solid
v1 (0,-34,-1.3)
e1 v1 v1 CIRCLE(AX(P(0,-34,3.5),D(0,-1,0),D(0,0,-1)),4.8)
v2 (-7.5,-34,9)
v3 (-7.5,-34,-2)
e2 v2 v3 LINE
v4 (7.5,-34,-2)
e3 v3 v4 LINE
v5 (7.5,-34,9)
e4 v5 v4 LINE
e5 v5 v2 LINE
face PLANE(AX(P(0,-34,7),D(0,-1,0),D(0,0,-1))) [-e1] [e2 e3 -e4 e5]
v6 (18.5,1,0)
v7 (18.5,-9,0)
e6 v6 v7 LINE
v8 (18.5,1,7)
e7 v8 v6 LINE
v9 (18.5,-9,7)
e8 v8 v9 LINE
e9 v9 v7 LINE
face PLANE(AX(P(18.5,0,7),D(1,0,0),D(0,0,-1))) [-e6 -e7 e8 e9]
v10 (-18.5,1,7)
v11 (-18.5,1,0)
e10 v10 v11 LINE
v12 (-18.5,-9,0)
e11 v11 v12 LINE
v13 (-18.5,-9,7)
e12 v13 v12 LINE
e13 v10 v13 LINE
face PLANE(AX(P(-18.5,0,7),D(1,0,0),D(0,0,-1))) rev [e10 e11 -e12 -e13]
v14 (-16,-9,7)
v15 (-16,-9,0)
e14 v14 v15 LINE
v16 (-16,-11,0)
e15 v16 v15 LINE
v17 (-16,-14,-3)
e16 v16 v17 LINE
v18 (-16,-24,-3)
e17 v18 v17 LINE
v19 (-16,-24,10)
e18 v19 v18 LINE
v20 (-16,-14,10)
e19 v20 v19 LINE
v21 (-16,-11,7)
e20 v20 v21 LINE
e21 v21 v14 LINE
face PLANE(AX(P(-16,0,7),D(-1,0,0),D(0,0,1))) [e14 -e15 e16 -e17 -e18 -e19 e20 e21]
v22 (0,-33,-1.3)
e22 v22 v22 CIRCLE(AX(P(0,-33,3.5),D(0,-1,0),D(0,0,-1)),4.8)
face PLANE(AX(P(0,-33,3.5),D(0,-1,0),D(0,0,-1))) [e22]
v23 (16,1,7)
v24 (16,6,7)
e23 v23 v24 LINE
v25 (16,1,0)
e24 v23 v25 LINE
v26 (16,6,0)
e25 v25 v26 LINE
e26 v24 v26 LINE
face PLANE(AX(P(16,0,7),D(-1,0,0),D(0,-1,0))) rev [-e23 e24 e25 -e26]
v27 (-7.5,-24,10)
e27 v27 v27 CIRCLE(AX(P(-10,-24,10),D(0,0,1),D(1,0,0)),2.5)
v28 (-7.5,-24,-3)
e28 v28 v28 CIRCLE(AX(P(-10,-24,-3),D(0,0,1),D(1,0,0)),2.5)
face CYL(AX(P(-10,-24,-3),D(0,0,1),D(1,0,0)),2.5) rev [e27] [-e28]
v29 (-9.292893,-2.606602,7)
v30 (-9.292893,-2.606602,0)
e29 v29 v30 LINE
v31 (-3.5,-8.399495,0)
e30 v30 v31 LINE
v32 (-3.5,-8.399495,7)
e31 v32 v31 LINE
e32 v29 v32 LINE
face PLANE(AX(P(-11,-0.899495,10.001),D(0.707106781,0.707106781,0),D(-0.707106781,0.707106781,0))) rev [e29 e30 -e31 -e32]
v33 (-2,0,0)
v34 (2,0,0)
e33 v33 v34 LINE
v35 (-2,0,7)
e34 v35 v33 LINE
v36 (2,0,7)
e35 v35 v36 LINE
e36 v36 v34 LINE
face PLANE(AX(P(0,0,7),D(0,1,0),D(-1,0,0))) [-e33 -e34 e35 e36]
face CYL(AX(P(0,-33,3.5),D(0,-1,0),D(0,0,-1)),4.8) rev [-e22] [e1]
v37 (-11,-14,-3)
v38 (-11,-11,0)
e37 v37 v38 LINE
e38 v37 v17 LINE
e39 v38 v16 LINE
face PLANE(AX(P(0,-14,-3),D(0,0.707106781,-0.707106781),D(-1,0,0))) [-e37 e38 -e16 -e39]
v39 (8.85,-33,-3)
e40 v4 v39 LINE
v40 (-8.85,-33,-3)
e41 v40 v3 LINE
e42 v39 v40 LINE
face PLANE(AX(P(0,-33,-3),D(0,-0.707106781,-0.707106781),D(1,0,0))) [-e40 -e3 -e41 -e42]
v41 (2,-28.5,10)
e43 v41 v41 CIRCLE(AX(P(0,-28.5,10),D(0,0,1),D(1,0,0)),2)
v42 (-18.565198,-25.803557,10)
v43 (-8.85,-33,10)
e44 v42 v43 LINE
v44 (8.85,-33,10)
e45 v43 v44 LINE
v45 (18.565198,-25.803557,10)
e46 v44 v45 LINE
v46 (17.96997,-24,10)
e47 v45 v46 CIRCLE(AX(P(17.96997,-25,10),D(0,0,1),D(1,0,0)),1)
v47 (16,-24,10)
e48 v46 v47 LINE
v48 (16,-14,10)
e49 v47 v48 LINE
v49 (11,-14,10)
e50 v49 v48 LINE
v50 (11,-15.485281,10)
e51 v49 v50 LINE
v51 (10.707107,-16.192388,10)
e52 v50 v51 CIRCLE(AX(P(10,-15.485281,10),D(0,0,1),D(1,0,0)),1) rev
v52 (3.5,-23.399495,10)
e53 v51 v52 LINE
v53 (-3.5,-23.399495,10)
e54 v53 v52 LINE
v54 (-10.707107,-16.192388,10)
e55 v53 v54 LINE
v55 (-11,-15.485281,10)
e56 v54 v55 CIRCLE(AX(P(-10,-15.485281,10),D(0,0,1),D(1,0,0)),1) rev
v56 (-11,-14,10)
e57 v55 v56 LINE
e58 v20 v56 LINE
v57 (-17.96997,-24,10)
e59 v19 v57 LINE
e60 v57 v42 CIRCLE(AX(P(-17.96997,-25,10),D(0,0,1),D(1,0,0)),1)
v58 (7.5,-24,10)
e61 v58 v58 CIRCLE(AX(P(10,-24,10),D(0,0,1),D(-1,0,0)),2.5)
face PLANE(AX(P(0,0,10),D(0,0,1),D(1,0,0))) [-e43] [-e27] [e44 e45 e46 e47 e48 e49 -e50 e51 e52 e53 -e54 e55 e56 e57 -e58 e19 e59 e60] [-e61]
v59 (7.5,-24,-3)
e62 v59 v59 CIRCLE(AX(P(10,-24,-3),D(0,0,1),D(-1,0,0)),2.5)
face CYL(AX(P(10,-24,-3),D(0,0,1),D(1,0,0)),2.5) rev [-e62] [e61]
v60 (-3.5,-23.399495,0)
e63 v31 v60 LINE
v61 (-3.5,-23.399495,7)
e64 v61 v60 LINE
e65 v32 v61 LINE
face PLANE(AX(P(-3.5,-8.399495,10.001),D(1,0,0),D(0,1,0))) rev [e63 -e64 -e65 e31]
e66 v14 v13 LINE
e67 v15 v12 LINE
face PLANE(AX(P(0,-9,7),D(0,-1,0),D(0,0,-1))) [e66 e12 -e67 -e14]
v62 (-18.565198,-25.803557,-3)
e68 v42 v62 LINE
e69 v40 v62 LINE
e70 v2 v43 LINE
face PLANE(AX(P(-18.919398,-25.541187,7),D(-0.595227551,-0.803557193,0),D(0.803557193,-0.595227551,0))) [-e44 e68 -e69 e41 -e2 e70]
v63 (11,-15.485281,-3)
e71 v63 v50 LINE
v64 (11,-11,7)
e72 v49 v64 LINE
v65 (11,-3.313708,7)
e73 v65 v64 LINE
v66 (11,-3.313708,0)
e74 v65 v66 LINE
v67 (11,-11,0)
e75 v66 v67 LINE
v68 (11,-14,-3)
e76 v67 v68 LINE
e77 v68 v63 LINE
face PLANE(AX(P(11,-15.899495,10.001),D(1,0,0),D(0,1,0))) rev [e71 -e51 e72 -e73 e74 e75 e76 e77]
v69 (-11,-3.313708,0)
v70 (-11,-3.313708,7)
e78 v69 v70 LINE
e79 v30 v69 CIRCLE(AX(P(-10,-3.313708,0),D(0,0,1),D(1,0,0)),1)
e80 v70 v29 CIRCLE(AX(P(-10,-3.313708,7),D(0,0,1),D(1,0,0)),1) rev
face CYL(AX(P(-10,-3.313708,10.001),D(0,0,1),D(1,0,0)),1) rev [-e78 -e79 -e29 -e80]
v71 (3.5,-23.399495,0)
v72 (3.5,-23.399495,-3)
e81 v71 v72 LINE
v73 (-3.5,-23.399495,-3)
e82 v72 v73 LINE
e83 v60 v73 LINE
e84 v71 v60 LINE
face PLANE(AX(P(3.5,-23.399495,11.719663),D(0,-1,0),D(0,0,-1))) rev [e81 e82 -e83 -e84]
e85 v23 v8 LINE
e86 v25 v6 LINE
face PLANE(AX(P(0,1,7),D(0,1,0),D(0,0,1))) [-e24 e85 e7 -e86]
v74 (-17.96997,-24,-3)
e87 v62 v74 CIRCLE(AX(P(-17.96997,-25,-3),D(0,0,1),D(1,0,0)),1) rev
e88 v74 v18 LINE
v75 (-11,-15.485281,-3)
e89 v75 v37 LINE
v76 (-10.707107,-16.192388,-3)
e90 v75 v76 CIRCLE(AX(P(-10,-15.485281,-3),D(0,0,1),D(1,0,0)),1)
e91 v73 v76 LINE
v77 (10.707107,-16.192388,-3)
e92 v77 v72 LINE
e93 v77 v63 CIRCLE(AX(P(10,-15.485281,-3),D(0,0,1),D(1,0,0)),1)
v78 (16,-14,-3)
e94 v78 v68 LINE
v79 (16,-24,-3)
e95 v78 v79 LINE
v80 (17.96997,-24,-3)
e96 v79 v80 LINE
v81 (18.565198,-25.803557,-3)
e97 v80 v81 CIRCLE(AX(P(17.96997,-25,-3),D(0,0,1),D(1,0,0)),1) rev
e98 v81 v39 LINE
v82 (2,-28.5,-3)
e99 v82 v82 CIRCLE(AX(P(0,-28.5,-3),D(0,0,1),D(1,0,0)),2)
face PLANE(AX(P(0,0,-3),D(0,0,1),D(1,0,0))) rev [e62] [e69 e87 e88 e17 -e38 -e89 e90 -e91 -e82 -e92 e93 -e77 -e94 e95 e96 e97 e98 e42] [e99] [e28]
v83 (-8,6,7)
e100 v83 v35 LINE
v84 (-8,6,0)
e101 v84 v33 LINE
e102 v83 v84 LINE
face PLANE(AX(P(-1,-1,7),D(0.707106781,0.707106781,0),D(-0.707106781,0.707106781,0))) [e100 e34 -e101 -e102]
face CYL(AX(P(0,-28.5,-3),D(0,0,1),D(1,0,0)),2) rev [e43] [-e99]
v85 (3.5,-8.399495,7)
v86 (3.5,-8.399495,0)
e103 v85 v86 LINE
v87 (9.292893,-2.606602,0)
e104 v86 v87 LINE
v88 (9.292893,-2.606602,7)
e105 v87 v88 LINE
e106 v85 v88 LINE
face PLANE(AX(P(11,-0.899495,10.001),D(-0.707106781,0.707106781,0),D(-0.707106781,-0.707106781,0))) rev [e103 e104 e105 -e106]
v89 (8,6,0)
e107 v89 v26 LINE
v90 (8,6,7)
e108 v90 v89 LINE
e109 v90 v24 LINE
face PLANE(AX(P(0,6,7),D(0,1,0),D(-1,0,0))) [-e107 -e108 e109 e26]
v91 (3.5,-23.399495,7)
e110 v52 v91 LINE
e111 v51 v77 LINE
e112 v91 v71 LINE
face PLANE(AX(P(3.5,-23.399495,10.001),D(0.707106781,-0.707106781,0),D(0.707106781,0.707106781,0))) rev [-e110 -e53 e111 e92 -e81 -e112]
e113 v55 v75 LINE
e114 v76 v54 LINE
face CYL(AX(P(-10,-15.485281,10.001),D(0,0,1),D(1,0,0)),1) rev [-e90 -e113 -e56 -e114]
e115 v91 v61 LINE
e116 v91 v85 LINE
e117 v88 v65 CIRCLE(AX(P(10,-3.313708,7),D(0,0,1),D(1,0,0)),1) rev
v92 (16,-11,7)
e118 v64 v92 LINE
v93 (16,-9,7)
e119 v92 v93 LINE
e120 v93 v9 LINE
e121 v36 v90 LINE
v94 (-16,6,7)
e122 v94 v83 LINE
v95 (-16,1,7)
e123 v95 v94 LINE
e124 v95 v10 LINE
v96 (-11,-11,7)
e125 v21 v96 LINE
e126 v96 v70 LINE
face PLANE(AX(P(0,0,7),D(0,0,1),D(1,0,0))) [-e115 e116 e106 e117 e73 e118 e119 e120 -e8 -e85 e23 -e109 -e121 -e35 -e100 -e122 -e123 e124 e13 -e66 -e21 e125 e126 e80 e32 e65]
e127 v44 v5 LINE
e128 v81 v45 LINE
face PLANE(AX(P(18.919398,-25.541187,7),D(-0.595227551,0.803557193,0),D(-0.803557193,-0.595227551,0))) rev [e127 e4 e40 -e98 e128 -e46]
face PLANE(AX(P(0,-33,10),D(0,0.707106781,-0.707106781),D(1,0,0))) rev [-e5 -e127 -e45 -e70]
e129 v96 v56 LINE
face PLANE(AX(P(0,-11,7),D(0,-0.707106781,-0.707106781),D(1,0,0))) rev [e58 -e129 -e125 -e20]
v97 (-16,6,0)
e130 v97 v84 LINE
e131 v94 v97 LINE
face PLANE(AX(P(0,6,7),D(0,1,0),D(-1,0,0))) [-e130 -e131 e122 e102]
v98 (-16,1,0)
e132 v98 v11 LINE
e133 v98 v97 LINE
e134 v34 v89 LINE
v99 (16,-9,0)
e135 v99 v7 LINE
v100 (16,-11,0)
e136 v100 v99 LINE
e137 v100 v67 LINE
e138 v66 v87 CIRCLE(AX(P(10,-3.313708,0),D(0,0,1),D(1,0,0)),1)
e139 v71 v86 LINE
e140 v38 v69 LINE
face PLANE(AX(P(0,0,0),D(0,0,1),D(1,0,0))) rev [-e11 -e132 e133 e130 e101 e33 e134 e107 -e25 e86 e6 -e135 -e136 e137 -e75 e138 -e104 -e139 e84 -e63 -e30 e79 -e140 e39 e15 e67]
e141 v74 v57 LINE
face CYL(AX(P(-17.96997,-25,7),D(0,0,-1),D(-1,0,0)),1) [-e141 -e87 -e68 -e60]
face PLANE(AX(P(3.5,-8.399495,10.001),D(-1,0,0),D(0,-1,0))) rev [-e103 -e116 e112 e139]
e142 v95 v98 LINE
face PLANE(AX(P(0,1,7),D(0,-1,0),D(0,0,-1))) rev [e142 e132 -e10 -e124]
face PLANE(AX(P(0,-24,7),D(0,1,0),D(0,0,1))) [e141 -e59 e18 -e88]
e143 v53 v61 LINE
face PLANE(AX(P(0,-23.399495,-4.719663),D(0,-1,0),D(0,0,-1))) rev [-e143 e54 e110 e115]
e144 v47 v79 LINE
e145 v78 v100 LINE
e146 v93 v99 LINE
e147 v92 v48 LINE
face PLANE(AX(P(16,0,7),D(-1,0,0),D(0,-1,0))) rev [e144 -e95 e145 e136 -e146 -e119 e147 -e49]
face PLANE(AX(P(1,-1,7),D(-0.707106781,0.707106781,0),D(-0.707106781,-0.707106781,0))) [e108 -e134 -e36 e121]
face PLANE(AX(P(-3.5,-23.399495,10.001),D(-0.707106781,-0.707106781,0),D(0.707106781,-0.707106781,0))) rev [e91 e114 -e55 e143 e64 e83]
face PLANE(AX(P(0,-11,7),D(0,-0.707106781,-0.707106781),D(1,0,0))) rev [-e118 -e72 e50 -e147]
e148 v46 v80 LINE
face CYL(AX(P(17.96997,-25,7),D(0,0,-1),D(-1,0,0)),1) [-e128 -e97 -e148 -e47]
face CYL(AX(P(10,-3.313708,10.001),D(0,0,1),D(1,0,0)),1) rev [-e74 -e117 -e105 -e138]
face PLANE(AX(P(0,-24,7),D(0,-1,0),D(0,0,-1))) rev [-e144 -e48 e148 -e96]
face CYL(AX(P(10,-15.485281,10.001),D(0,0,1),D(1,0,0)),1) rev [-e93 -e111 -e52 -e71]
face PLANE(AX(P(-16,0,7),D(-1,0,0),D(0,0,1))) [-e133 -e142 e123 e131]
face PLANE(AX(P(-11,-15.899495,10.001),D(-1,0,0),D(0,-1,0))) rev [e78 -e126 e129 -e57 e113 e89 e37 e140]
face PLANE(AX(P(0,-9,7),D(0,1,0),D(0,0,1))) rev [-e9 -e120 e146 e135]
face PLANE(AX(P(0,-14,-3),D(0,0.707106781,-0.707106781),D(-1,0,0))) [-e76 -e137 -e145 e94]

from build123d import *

# Parameters (mm, degrees)
ESQUISSE1_W             = 2.5
ESQUISSE1_H             = 10
BOSS_EXTRU_1_DEPTH      = 7
BOSS_EXTRU_2_DEPTH      = 3
BOSS_EXTRU_2_DEPTH_BACK = 10
ENL_V_MAT_EXTRU_1_REACH = 44.024
ESQUISSE4_4_W           = 7
ESQUISSE4_4_H           = 9.399494937
ENL_V_MAT_EXTRU_4_DEPTH = 3
ENL_V_START             = -13
ESQUISSE4_W             = 7
ESQUISSE4_H             = 9.399494937
ENL_V_MAT_EXTRU_2_DEPTH = 3
CHANFREIN1_SIZE         = 3
CONG_1_R                = 1
ESQUISSE5_R             = 4.8
ENL_V_MAT_EXTRU_5_DEPTH = 1
ESQUISSE6_R             = 2.5
ESQUISSE6_R_2           = 2
ENL_V_MAT_EXTRU_6_DEPTH = 42.047043387
CHANFREIN2_SIZE         = 1


with BuildPart() as part:
    # Esquisse1 → Boss.-Extru.1 (new body)
    with BuildSketch(Plane.XY):
        Polygon((-8, 6), (-16, 6), (-16, 1), (-16, -9), (-16, -24), (-21, -24), (-7.5, -34), (0, -34), (0, 0), (-2, 0), align=None)
        Polygon((2, 0), (0, 0), (0, -34), (7.5, -34), (21, -24), (16, -24), (16, -9), (16, 1), (16, 6), (8, 6), align=None)
        with Locations((17.25, -4)):
            Rectangle(ESQUISSE1_W, ESQUISSE1_H)
        with Locations((-17.25, -4)):
            Rectangle(ESQUISSE1_W, ESQUISSE1_H)
    extrude(amount=BOSS_EXTRU_1_DEPTH)

    # Esquisse2 → Boss.-Extru.2 (add, two sides: drawn at the far end of the back side and taken through both)
    with BuildSketch(Plane.XY.offset(7).offset(-BOSS_EXTRU_2_DEPTH_BACK)):
        Polygon((16, -14), (-16, -14), (-16, -24), (-21, -24), (-7.5, -34), (7.5, -34), (21, -24), (16, -24), align=None)
    extrude(amount=BOSS_EXTRU_2_DEPTH + BOSS_EXTRU_2_DEPTH_BACK)

    # Esquisse3 → Enlèv. mat.-Extru.1 (cut, up to next)
    with BuildSketch(Plane(origin=(0, 0, -3), x_dir=(-1, 0, 0), z_dir=(0, 0, -1)), mode=Mode.PRIVATE) as enl_v_mat_extru_1_sk1:
        Polygon((-11, -0.899494937), (-3.5, -8.399494937), (-3.5, -23.399494937), (-11, -15.899494937), align=None)
    enl_v_mat_extru_1_tool1 = extrude(enl_v_mat_extru_1_sk1.sketch, amount=-ENL_V_MAT_EXTRU_1_REACH, mode=Mode.PRIVATE) & part.part
    # Esquisse3 → Enlèv. mat.-Extru.1 (cut, up to next)
    with BuildSketch(Plane(origin=(0, 0, -3), x_dir=(-1, 0, 0), z_dir=(0, 0, -1)), mode=Mode.PRIVATE) as enl_v_mat_extru_1_sk2:
        Polygon((11, -15.899494937), (11, -0.899494937), (3.5, -8.399494937), (3.5, -23.399494937), align=None)
    enl_v_mat_extru_1_tool2 = extrude(enl_v_mat_extru_1_sk2.sketch, amount=-ENL_V_MAT_EXTRU_1_REACH, mode=Mode.PRIVATE) & part.part
    add(enl_v_mat_extru_1_tool1.solids().sort_by_distance((7.25, -12.149495, -3))[0], mode=Mode.SUBTRACT)
    add(enl_v_mat_extru_1_tool2.solids().sort_by_distance((-7.25, -12.149495, -3))[0], mode=Mode.SUBTRACT)

    # Esquisse4<4> → Enlèv. mat.-Extru.4 (cut)
    with BuildSketch(Plane(origin=(0, 0, -3), x_dir=(-1, 0, 0), z_dir=(0, 0, -1))):
        with Locations((0, -18.699747469)):
            Rectangle(ESQUISSE4_4_W, ESQUISSE4_4_H)
    extrude(amount=-ENL_V_MAT_EXTRU_4_DEPTH, mode=Mode.SUBTRACT)

    # Esquisse4 → Enlèv. mat.-Extru.2 (cut)
    with BuildSketch(Plane(origin=(0, 0, -3), x_dir=(-1, 0, 0), z_dir=(0, 0, -1)).offset(ENL_V_START)):
        with Locations((0, -18.699747469)):
            Rectangle(ESQUISSE4_W, ESQUISSE4_H)
    extrude(amount=ENL_V_MAT_EXTRU_2_DEPTH, mode=Mode.SUBTRACT)

    # Chanfrein1
    chanfrein1_edges = [part.edges().sort_by_distance(p)[0] for p in [
        (-13.5, -14, 0),
        (-13.5, -14, 7),
        (13.5, -14, 0),
        (13.5, -14, 7),
    ]]
    chamfer(chanfrein1_edges, length=CHANFREIN1_SIZE - 0.0001)  # a hair under: the kernel refuses the full size

    # Congé1
    cong_1_edges = [part.edges().sort_by_distance(p)[0] for p in [
        (11, -15.899494937, 3.5),
        (11, -0.899494937, 3.5),
        (-11, -0.899494937, 3.5),
        (-11, -15.899494937, 3.5),
        (-21, -24, 3.5),
        (21, -24, 3.5),
    ]]
    fillet(cong_1_edges, radius=CONG_1_R)

    # Esquisse5 → Enlèv. mat.-Extru.5 (cut)
    with BuildSketch(Plane.XZ.offset(34)):
        with Locations(Location((0, 3.5, 0), (0, 0, 270))):
            Circle(ESQUISSE5_R)
    extrude(amount=-ENL_V_MAT_EXTRU_5_DEPTH, mode=Mode.SUBTRACT)

    # Esquisse6 → Enlèv. mat.-Extru.6 (cut, through all)
    with BuildSketch(Plane.XY.offset(10)):
        with Locations((-10, -24)):
            Circle(ESQUISSE6_R)
        with Locations((0, -28.5)):
            Circle(ESQUISSE6_R_2)
        with Locations(Location((10, -24, 0), (0, 0, 180))):
            Circle(ESQUISSE6_R)
    extrude(amount=-ENL_V_MAT_EXTRU_6_DEPTH, mode=Mode.SUBTRACT)

    # Chanfrein2
    chanfrein2_edges = [part.edges().sort_by_distance(p)[0] for p in [
        (0, -34, -3),
        (0, -34, 10),
    ]]
    chamfer(chanfrein2_edges, length=CHANFREIN2_SIZE)


solid = part.part
